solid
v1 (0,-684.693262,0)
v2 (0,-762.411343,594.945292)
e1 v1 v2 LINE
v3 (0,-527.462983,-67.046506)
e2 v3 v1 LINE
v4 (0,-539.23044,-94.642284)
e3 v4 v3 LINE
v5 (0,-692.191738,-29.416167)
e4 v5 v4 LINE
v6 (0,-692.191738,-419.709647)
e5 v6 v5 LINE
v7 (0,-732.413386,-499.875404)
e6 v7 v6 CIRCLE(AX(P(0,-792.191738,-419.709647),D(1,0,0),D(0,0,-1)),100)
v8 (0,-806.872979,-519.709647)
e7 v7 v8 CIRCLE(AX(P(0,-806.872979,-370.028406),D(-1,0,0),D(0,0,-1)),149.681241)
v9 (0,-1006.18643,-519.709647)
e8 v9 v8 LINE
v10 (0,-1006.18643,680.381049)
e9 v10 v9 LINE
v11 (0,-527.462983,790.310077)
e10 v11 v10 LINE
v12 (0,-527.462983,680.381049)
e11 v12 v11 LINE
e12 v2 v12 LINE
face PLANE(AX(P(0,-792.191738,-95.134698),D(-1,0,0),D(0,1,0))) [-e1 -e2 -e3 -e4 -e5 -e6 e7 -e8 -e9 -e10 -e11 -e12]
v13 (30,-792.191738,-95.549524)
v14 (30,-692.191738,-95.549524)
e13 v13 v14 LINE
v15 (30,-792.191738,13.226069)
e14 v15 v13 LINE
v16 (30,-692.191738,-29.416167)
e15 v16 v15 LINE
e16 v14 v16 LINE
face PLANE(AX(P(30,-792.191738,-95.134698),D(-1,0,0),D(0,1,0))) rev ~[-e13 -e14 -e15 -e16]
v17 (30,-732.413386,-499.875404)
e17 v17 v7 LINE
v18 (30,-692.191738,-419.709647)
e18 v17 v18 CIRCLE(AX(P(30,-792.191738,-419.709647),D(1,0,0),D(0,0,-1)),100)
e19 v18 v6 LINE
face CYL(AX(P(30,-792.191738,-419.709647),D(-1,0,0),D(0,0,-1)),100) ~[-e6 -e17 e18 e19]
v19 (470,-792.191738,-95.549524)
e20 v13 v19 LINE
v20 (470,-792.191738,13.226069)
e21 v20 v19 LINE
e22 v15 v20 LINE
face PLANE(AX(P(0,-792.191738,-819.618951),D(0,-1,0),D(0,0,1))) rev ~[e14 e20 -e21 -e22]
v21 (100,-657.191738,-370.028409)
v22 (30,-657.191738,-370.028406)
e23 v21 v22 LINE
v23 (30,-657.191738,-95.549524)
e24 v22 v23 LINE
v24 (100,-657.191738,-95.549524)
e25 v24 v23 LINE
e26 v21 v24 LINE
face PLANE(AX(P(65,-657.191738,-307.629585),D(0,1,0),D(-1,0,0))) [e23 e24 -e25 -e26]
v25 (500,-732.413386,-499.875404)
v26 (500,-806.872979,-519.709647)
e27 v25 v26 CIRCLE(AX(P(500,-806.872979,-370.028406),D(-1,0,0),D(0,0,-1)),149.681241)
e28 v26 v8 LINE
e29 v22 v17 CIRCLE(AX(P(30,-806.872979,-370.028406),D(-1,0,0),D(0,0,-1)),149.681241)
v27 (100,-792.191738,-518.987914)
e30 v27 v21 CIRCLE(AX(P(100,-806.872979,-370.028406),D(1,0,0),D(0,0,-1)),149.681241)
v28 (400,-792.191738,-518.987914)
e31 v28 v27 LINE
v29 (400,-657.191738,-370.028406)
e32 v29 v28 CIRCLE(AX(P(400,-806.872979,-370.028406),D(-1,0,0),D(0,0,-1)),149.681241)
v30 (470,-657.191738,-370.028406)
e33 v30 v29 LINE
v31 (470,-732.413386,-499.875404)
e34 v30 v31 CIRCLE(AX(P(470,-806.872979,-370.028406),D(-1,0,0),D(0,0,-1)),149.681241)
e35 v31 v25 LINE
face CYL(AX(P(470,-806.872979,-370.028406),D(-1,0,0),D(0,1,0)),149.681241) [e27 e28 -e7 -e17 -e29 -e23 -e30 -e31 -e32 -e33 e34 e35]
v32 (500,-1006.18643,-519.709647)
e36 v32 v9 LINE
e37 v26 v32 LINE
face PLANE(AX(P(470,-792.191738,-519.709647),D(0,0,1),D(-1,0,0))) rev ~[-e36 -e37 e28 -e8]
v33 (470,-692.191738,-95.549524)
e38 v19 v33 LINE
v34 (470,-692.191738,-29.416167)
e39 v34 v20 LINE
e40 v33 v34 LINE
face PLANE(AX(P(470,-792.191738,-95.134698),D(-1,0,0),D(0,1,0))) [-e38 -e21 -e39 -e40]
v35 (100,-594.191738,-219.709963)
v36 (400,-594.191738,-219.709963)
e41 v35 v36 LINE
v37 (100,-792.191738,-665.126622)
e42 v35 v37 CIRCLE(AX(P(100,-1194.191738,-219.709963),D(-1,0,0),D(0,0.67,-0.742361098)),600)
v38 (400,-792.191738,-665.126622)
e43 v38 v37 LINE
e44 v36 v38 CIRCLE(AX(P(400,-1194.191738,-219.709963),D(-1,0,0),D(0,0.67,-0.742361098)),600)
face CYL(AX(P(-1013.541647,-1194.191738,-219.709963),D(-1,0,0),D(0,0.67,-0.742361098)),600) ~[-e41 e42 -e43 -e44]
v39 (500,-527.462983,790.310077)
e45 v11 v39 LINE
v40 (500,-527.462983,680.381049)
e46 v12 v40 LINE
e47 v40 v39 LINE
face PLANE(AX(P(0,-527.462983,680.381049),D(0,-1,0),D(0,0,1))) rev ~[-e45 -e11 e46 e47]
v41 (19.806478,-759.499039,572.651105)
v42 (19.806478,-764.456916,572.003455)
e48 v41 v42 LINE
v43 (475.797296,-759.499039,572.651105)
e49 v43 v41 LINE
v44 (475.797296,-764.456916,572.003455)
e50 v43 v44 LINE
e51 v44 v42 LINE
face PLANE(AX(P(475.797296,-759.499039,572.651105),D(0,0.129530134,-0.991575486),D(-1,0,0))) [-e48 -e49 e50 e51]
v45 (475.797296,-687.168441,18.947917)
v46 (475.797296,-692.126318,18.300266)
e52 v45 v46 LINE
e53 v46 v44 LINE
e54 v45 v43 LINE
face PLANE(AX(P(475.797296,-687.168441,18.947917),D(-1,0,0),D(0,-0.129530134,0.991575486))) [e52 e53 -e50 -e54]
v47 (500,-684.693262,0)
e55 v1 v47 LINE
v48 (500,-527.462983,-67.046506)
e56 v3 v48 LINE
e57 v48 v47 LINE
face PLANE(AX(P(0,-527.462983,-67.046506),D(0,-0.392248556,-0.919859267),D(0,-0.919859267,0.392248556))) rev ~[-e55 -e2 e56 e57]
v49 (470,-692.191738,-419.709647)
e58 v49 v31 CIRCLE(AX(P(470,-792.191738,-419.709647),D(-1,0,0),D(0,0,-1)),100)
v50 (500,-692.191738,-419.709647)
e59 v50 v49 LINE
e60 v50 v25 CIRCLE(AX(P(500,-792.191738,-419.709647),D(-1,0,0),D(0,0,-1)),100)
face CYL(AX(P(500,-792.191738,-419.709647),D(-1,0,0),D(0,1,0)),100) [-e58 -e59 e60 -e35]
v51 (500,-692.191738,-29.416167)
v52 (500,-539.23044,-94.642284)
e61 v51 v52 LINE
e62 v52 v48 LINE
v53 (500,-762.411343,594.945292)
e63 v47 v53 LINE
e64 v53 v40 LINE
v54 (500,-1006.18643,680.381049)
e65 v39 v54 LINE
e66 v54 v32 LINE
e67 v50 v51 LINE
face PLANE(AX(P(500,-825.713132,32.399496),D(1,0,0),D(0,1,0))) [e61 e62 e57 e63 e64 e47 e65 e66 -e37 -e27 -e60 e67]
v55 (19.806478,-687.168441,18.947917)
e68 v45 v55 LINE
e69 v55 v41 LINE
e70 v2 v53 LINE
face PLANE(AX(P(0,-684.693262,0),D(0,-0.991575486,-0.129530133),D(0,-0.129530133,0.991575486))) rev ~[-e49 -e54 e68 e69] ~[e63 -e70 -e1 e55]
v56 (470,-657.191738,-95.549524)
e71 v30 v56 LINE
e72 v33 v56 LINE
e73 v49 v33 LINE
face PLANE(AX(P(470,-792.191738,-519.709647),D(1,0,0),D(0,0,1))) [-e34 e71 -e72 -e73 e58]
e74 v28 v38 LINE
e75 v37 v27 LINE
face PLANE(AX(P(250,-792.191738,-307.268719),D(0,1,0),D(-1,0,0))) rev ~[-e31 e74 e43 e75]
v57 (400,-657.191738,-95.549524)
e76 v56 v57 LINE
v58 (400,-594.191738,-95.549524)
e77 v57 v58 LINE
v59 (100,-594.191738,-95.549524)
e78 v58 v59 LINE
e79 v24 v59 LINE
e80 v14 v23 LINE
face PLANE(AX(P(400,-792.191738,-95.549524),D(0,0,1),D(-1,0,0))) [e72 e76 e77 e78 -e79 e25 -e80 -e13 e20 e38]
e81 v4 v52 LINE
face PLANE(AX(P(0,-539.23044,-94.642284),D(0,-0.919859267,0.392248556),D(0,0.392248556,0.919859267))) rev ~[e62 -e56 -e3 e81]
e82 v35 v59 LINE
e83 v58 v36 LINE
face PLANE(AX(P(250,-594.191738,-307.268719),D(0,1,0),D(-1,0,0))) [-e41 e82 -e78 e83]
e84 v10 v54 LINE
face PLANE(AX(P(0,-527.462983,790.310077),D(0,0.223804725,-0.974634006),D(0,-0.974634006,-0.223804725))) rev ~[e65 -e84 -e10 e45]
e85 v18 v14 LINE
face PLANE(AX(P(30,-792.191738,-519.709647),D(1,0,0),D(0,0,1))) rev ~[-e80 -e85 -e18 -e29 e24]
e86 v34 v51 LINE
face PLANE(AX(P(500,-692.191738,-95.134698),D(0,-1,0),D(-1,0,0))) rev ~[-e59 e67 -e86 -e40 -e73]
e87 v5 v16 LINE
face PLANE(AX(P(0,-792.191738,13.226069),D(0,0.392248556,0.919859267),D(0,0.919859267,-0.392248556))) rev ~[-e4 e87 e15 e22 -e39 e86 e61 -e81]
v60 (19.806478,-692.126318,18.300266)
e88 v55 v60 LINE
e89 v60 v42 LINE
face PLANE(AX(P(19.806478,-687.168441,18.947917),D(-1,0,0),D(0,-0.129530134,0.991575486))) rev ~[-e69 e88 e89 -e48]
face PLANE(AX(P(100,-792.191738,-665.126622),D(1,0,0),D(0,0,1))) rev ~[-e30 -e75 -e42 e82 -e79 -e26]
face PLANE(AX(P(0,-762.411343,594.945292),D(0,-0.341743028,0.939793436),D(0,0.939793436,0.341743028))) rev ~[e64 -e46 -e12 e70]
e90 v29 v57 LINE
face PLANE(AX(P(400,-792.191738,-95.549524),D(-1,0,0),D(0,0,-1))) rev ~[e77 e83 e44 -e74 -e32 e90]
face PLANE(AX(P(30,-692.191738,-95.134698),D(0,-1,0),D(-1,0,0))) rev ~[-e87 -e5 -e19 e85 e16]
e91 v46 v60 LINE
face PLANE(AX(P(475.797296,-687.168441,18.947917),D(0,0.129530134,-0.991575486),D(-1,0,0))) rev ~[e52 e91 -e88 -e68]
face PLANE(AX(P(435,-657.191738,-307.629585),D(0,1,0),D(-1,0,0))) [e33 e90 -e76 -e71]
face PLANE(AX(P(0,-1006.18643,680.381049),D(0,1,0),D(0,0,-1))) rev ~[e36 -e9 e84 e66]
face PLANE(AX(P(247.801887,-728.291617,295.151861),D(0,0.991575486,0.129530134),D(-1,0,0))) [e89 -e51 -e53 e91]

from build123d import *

# Parameters (mm, degrees)
F1_DEPTH     = 500
F2_W         = 500
F2_H         = 299.909304566
F3_DEPTH     = 213.9956919492
F4_W         = 30
F4_H         = 424.5749488473
F5_DEPTH     = 100
F6_DEPTH     = 138
F7_R         = 100
F8_W         = 70
F8_H         = 424.1601228714
F9_DEPTH     = 135
F10_F1_R     = 149.6812408671
F11_W        = 300
F11_H        = 423.4383900396
F11_H_2      = 146.1387078532
F12_DEPTH    = 198
F13_T1_DEPTH = 2527.0832943561
F14_W        = 455.9908173978
F14_H        = 558.4075003862
F15_DEPTH    = 5


# Not quite as in the source:
# - a fillet or chamfer that OpenCascade refuses, or shapes differently, is made with other operations: its cross-section is extruded or revolved along the edge and cut away or added


with BuildPart() as f1:
    # F0 (on Right) → F1 (new body)
    with BuildSketch(Plane.YZ):
        Polygon((-1006.1864304423, 680.3810487322), (-1006.1864304423, -819.6189512678), (-792.191738493, -819.6189512678), (-792.191738493, 13.2260688636), (-539.2304401761, -94.6422840199), (-527.4629834979, -67.0465060217), (-684.6932624212, 0), (-762.4113425204, 594.9452916241), (-527.4629834979, 680.3810487322), (-527.4629834979, 790.310077366), align=None)
    extrude(amount=F1_DEPTH)

    # F2 (on face) → F3 (cut, through all)
    with BuildSketch(Plane(origin=(0, -792.191738493, 0), x_dir=(-1, 0, 0), z_dir=(0, 1, 0))):
        with Locations((-250, -669.6642989848)):
            Rectangle(F2_W, F2_H)
    extrude(amount=-F3_DEPTH, mode=Mode.SUBTRACT)

    # F4 (on face) → F5 (join)
    with BuildSketch(Plane(origin=(0, -792.191738493, 0), x_dir=(-1, 0, 0), z_dir=(0, 1, 0))):
        with Locations((-15, -307.4221722782)):
            Rectangle(F4_W, F4_H)
        with Locations((-485, -307.4221722782)):
            Rectangle(F4_W, F4_H)
    extrude(amount=F5_DEPTH)

    # F6 (add): faces of the model
    f6_faces = [f1.faces().sort_by_distance(p)[0] for p in [
        (15, -742.191738493, -95.1346978545),
        (485, -742.191738493, -95.1346978545),
    ]]
    extrude(f6_faces, amount=F6_DEPTH)

    # F7
    f7_edges = [f1.edges().sort_by_distance(p)[0] for p in [
        (485, -692.191738, -519.709647),
        (15, -692.191738, -519.709647),
    ]]
    fillet(f7_edges, radius=F7_R)

    # F8 (on face) → F9 (join)
    with BuildSketch(Plane(origin=(0, -792.191738493, 0), x_dir=(-1, 0, 0), z_dir=(0, 1, 0))):
        with Locations((-435, -307.6295852661)):
            Rectangle(F8_W, F8_H)
        with Locations((-65, -307.6295852661)):
            Rectangle(F8_W, F8_H)
    extrude(amount=F9_DEPTH)

    # F10: fillet of radius 149.6812408671 on 2 edges, made by hand

    # F10_f1
    f10_f1_edges = [f1.edges().sort_by_distance(p)[0] for p in [
        (435, -657.191738493, -519.7096467018),
    ]]
    fillet(f10_f1_edges, radius=F10_F1_R)

    # F11 (on face) → F12 (join)
    with BuildSketch(Plane(origin=(0, -792.191738493, 0), x_dir=(-1, 0, 0), z_dir=(0, 1, 0))):
        with Locations((-250, -307.2687188502)):
            Rectangle(F11_W, F11_H)
        with Locations((-250, -592.0572677966)):
            Rectangle(F11_W, F11_H_2)
    extrude(amount=F12_DEPTH)

    # F13: fillet of radius 600 on 1 edges, made by hand

    # F13_s2 → F13_t1 (cut)
    with BuildSketch(Plane.YZ.offset(-1013.541647178)):
        with BuildLine():
            ThreePointArc((-792.191738493, -665.1266217232), (-645.9217320181, -463.431114991), (-594.191738493, -219.709962852))
            Line((-594.191738493, -219.709962852), (-594.191738493, -665.1266217232))
            Line((-594.191738493, -665.1266217232), (-792.191738493, -665.1266217232))
        make_face()
    extrude(amount=F13_T1_DEPTH, mode=Mode.SUBTRACT)

    # F14 (on face) → F15 (cut)
    with BuildSketch(Plane(origin=(0, -673.2054408747, -87.9412529416), x_dir=(-1, 0, 0), z_dir=(0, 0.991575486, 0.1295301335))):
        with Locations((-247.8018868715, 387.0010599494)):
            Rectangle(F14_W, F14_H)
    extrude(amount=-F15_DEPTH, mode=Mode.SUBTRACT)


solid = f1.part
